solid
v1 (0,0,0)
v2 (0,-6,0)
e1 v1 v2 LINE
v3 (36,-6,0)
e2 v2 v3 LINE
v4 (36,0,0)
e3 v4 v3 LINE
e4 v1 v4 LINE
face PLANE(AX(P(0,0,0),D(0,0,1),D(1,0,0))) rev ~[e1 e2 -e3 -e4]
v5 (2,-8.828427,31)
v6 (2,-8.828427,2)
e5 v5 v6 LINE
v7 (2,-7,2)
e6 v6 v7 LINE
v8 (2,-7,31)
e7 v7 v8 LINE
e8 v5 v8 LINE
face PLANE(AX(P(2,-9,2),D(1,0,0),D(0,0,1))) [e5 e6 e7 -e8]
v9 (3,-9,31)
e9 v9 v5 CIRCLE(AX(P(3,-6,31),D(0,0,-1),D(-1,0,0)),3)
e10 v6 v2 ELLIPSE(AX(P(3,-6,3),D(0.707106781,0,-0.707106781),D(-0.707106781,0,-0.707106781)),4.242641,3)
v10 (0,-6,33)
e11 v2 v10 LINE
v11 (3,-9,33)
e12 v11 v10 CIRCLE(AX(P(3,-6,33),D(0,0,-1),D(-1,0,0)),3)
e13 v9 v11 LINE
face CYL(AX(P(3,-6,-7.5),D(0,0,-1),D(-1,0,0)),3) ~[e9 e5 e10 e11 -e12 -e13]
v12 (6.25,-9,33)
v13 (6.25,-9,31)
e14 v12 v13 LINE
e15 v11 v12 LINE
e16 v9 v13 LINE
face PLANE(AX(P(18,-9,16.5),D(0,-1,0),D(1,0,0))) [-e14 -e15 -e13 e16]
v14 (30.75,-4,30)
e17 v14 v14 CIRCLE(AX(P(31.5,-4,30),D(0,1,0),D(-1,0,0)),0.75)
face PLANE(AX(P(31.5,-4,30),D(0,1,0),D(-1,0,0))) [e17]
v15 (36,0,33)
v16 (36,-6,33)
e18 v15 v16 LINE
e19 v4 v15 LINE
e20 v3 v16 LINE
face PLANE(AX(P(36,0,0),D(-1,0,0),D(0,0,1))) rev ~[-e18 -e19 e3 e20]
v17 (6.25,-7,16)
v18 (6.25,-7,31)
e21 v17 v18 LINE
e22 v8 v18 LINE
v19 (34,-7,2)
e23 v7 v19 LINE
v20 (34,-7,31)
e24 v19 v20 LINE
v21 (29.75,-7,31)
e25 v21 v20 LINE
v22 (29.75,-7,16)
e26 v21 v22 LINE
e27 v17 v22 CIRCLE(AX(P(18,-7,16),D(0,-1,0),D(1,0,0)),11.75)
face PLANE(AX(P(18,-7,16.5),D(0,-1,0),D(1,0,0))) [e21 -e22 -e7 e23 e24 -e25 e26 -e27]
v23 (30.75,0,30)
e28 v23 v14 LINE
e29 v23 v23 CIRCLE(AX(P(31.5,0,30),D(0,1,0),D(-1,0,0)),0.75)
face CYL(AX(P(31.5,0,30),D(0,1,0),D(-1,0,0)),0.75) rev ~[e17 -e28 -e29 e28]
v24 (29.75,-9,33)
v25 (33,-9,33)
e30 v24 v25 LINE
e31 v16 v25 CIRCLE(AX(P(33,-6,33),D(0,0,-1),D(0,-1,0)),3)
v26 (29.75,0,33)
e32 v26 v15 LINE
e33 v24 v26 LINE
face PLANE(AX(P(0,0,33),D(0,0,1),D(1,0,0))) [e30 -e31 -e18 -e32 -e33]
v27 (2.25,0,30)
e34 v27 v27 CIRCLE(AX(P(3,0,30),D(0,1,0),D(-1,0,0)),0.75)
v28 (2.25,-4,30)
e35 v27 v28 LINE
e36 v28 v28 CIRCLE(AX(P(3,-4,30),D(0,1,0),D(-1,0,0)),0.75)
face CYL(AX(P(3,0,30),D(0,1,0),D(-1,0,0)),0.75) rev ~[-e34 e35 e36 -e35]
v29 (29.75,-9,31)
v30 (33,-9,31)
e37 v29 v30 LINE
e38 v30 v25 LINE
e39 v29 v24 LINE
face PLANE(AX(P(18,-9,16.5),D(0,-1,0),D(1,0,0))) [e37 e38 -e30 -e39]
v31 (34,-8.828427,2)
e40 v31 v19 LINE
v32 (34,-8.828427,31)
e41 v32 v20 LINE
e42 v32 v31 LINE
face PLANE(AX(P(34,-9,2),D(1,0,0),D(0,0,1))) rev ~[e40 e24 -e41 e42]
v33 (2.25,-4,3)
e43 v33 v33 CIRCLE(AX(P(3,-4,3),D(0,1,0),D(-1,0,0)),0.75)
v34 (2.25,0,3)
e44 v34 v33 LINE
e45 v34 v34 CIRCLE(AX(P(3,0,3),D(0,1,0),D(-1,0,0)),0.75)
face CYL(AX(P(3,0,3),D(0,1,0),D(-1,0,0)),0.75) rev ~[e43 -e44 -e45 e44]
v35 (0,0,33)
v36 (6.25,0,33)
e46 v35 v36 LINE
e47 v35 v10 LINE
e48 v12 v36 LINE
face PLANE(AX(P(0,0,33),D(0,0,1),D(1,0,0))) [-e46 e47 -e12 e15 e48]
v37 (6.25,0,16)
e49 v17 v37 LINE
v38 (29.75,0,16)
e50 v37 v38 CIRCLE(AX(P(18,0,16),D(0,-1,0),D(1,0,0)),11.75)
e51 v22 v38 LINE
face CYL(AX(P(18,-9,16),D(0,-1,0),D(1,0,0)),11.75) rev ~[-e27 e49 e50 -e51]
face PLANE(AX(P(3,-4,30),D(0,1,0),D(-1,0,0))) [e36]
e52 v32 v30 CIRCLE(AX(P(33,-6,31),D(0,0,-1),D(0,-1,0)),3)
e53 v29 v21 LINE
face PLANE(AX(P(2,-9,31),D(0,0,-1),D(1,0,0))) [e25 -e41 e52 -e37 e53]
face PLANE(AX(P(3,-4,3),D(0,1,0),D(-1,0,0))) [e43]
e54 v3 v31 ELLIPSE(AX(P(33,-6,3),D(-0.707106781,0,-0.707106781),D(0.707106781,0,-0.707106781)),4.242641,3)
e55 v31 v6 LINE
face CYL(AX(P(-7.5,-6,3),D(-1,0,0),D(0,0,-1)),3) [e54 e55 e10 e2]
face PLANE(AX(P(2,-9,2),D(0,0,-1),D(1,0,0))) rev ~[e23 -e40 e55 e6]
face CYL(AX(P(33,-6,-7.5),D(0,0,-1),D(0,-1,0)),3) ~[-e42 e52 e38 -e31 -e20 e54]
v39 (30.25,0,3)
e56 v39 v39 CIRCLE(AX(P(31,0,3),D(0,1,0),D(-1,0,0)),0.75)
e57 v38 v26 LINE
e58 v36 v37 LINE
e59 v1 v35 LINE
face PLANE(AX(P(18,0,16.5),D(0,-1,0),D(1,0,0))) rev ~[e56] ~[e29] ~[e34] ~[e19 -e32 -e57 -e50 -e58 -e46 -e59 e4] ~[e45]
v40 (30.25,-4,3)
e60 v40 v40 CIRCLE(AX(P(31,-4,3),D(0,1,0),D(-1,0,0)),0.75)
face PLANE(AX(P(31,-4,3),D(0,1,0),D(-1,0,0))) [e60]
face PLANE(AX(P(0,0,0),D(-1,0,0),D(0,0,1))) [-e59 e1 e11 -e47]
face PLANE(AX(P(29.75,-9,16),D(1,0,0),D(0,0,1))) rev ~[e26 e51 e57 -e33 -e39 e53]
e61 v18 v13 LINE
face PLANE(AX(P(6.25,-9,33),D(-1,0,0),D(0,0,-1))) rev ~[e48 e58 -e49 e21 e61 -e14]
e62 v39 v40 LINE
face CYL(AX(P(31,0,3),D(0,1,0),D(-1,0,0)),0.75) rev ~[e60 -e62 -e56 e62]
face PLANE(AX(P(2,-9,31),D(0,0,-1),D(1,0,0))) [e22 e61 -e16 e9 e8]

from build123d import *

# Parameters (mm, degrees)
F0_W        = 36
F0_H        = 33
F1_DEPTH    = 9
F3_DEPTH    = 25
F4_W        = 32
F4_H        = 29
F5_DEPTH    = 2
F6_R        = 0.75
F7_DEPTH    = 4
F8_T1_DEPTH = 48
F8_T3_DEPTH = 51


# Not quite as in the source:
# - a fillet or chamfer that OpenCascade refuses, or shapes differently, is made with other operations: its cross-section is extruded or revolved along the edge and cut away or added


with BuildPart() as f1:
    # F0 (on Front) → F1 (new body)
    with BuildSketch(Plane.XZ):
        with Locations((18, 16.5)):
            Rectangle(F0_W, F0_H)
    extrude(amount=F1_DEPTH)

    # F2 (on face) → F3 (cut)
    with BuildSketch(Plane.XZ.offset(9)):
        with BuildLine():
            ThreePointArc((6.25, 16), (18, 4.25), (29.75, 16))
            ThreePointArc((29.75, 16), (18, 27.75), (6.25, 16))
        make_face()
        with BuildLine():
            ThreePointArc((6.25, 16), (18, 27.75), (29.75, 16))
            Line((29.75, 16), (29.75, 33))
            Line((29.75, 33), (6.25, 33))
            Line((6.25, 33), (6.25, 16))
        make_face()
    extrude(amount=-F3_DEPTH, mode=Mode.SUBTRACT)

    # F4 (on face) → F5 (cut)
    with BuildSketch(Plane.XZ.offset(9)):
        with Locations((18, 16.5)):
            Rectangle(F4_W, F4_H)
    extrude(amount=-F5_DEPTH, mode=Mode.SUBTRACT)

    # F6 (on face) → F7 (cut)
    with BuildSketch(Plane(origin=(0, 0, 0), x_dir=(-1, 0, 0), z_dir=(0, 1, 0))):
        with Locations((-31.5, 30)):
            Circle(F6_R)
        with Locations((-3, 30)):
            Circle(F6_R)
        with Locations((-3, 3)):
            Circle(F6_R)
        with Locations((-31, 3)):
            Circle(F6_R)
    extrude(amount=-F7_DEPTH, mode=Mode.SUBTRACT)

    # F8: fillet of radius 3 on 3 edges, made by hand

    # F8_s2 → F8_t1 (cut)
    with BuildSketch(Plane.XY.offset(-7.5)):
        with BuildLine():
            ThreePointArc((33, -9), (35.1213203436, -8.1213203436), (36, -6))
            Line((36, -6), (36, -9))
            Line((36, -9), (33, -9))
        make_face()
        with BuildLine():
            ThreePointArc((0, -6), (0.8786796564, -8.1213203436), (3, -9))
            Line((3, -9), (0, -9))
            Line((0, -9), (0, -6))
        make_face()
    extrude(amount=F8_T1_DEPTH, mode=Mode.SUBTRACT)

    # F8_s4 → F8_t3 (cut)
    with BuildSketch(Plane.YZ.offset(-7.5)):
        with BuildLine():
            ThreePointArc((-6, 0), (-8.1213203436, 0.8786796564), (-9, 3))
            Line((-9, 3), (-9, 0))
            Line((-9, 0), (-6, 0))
        make_face()
    extrude(amount=F8_T3_DEPTH, mode=Mode.SUBTRACT)


solid = f1.part
